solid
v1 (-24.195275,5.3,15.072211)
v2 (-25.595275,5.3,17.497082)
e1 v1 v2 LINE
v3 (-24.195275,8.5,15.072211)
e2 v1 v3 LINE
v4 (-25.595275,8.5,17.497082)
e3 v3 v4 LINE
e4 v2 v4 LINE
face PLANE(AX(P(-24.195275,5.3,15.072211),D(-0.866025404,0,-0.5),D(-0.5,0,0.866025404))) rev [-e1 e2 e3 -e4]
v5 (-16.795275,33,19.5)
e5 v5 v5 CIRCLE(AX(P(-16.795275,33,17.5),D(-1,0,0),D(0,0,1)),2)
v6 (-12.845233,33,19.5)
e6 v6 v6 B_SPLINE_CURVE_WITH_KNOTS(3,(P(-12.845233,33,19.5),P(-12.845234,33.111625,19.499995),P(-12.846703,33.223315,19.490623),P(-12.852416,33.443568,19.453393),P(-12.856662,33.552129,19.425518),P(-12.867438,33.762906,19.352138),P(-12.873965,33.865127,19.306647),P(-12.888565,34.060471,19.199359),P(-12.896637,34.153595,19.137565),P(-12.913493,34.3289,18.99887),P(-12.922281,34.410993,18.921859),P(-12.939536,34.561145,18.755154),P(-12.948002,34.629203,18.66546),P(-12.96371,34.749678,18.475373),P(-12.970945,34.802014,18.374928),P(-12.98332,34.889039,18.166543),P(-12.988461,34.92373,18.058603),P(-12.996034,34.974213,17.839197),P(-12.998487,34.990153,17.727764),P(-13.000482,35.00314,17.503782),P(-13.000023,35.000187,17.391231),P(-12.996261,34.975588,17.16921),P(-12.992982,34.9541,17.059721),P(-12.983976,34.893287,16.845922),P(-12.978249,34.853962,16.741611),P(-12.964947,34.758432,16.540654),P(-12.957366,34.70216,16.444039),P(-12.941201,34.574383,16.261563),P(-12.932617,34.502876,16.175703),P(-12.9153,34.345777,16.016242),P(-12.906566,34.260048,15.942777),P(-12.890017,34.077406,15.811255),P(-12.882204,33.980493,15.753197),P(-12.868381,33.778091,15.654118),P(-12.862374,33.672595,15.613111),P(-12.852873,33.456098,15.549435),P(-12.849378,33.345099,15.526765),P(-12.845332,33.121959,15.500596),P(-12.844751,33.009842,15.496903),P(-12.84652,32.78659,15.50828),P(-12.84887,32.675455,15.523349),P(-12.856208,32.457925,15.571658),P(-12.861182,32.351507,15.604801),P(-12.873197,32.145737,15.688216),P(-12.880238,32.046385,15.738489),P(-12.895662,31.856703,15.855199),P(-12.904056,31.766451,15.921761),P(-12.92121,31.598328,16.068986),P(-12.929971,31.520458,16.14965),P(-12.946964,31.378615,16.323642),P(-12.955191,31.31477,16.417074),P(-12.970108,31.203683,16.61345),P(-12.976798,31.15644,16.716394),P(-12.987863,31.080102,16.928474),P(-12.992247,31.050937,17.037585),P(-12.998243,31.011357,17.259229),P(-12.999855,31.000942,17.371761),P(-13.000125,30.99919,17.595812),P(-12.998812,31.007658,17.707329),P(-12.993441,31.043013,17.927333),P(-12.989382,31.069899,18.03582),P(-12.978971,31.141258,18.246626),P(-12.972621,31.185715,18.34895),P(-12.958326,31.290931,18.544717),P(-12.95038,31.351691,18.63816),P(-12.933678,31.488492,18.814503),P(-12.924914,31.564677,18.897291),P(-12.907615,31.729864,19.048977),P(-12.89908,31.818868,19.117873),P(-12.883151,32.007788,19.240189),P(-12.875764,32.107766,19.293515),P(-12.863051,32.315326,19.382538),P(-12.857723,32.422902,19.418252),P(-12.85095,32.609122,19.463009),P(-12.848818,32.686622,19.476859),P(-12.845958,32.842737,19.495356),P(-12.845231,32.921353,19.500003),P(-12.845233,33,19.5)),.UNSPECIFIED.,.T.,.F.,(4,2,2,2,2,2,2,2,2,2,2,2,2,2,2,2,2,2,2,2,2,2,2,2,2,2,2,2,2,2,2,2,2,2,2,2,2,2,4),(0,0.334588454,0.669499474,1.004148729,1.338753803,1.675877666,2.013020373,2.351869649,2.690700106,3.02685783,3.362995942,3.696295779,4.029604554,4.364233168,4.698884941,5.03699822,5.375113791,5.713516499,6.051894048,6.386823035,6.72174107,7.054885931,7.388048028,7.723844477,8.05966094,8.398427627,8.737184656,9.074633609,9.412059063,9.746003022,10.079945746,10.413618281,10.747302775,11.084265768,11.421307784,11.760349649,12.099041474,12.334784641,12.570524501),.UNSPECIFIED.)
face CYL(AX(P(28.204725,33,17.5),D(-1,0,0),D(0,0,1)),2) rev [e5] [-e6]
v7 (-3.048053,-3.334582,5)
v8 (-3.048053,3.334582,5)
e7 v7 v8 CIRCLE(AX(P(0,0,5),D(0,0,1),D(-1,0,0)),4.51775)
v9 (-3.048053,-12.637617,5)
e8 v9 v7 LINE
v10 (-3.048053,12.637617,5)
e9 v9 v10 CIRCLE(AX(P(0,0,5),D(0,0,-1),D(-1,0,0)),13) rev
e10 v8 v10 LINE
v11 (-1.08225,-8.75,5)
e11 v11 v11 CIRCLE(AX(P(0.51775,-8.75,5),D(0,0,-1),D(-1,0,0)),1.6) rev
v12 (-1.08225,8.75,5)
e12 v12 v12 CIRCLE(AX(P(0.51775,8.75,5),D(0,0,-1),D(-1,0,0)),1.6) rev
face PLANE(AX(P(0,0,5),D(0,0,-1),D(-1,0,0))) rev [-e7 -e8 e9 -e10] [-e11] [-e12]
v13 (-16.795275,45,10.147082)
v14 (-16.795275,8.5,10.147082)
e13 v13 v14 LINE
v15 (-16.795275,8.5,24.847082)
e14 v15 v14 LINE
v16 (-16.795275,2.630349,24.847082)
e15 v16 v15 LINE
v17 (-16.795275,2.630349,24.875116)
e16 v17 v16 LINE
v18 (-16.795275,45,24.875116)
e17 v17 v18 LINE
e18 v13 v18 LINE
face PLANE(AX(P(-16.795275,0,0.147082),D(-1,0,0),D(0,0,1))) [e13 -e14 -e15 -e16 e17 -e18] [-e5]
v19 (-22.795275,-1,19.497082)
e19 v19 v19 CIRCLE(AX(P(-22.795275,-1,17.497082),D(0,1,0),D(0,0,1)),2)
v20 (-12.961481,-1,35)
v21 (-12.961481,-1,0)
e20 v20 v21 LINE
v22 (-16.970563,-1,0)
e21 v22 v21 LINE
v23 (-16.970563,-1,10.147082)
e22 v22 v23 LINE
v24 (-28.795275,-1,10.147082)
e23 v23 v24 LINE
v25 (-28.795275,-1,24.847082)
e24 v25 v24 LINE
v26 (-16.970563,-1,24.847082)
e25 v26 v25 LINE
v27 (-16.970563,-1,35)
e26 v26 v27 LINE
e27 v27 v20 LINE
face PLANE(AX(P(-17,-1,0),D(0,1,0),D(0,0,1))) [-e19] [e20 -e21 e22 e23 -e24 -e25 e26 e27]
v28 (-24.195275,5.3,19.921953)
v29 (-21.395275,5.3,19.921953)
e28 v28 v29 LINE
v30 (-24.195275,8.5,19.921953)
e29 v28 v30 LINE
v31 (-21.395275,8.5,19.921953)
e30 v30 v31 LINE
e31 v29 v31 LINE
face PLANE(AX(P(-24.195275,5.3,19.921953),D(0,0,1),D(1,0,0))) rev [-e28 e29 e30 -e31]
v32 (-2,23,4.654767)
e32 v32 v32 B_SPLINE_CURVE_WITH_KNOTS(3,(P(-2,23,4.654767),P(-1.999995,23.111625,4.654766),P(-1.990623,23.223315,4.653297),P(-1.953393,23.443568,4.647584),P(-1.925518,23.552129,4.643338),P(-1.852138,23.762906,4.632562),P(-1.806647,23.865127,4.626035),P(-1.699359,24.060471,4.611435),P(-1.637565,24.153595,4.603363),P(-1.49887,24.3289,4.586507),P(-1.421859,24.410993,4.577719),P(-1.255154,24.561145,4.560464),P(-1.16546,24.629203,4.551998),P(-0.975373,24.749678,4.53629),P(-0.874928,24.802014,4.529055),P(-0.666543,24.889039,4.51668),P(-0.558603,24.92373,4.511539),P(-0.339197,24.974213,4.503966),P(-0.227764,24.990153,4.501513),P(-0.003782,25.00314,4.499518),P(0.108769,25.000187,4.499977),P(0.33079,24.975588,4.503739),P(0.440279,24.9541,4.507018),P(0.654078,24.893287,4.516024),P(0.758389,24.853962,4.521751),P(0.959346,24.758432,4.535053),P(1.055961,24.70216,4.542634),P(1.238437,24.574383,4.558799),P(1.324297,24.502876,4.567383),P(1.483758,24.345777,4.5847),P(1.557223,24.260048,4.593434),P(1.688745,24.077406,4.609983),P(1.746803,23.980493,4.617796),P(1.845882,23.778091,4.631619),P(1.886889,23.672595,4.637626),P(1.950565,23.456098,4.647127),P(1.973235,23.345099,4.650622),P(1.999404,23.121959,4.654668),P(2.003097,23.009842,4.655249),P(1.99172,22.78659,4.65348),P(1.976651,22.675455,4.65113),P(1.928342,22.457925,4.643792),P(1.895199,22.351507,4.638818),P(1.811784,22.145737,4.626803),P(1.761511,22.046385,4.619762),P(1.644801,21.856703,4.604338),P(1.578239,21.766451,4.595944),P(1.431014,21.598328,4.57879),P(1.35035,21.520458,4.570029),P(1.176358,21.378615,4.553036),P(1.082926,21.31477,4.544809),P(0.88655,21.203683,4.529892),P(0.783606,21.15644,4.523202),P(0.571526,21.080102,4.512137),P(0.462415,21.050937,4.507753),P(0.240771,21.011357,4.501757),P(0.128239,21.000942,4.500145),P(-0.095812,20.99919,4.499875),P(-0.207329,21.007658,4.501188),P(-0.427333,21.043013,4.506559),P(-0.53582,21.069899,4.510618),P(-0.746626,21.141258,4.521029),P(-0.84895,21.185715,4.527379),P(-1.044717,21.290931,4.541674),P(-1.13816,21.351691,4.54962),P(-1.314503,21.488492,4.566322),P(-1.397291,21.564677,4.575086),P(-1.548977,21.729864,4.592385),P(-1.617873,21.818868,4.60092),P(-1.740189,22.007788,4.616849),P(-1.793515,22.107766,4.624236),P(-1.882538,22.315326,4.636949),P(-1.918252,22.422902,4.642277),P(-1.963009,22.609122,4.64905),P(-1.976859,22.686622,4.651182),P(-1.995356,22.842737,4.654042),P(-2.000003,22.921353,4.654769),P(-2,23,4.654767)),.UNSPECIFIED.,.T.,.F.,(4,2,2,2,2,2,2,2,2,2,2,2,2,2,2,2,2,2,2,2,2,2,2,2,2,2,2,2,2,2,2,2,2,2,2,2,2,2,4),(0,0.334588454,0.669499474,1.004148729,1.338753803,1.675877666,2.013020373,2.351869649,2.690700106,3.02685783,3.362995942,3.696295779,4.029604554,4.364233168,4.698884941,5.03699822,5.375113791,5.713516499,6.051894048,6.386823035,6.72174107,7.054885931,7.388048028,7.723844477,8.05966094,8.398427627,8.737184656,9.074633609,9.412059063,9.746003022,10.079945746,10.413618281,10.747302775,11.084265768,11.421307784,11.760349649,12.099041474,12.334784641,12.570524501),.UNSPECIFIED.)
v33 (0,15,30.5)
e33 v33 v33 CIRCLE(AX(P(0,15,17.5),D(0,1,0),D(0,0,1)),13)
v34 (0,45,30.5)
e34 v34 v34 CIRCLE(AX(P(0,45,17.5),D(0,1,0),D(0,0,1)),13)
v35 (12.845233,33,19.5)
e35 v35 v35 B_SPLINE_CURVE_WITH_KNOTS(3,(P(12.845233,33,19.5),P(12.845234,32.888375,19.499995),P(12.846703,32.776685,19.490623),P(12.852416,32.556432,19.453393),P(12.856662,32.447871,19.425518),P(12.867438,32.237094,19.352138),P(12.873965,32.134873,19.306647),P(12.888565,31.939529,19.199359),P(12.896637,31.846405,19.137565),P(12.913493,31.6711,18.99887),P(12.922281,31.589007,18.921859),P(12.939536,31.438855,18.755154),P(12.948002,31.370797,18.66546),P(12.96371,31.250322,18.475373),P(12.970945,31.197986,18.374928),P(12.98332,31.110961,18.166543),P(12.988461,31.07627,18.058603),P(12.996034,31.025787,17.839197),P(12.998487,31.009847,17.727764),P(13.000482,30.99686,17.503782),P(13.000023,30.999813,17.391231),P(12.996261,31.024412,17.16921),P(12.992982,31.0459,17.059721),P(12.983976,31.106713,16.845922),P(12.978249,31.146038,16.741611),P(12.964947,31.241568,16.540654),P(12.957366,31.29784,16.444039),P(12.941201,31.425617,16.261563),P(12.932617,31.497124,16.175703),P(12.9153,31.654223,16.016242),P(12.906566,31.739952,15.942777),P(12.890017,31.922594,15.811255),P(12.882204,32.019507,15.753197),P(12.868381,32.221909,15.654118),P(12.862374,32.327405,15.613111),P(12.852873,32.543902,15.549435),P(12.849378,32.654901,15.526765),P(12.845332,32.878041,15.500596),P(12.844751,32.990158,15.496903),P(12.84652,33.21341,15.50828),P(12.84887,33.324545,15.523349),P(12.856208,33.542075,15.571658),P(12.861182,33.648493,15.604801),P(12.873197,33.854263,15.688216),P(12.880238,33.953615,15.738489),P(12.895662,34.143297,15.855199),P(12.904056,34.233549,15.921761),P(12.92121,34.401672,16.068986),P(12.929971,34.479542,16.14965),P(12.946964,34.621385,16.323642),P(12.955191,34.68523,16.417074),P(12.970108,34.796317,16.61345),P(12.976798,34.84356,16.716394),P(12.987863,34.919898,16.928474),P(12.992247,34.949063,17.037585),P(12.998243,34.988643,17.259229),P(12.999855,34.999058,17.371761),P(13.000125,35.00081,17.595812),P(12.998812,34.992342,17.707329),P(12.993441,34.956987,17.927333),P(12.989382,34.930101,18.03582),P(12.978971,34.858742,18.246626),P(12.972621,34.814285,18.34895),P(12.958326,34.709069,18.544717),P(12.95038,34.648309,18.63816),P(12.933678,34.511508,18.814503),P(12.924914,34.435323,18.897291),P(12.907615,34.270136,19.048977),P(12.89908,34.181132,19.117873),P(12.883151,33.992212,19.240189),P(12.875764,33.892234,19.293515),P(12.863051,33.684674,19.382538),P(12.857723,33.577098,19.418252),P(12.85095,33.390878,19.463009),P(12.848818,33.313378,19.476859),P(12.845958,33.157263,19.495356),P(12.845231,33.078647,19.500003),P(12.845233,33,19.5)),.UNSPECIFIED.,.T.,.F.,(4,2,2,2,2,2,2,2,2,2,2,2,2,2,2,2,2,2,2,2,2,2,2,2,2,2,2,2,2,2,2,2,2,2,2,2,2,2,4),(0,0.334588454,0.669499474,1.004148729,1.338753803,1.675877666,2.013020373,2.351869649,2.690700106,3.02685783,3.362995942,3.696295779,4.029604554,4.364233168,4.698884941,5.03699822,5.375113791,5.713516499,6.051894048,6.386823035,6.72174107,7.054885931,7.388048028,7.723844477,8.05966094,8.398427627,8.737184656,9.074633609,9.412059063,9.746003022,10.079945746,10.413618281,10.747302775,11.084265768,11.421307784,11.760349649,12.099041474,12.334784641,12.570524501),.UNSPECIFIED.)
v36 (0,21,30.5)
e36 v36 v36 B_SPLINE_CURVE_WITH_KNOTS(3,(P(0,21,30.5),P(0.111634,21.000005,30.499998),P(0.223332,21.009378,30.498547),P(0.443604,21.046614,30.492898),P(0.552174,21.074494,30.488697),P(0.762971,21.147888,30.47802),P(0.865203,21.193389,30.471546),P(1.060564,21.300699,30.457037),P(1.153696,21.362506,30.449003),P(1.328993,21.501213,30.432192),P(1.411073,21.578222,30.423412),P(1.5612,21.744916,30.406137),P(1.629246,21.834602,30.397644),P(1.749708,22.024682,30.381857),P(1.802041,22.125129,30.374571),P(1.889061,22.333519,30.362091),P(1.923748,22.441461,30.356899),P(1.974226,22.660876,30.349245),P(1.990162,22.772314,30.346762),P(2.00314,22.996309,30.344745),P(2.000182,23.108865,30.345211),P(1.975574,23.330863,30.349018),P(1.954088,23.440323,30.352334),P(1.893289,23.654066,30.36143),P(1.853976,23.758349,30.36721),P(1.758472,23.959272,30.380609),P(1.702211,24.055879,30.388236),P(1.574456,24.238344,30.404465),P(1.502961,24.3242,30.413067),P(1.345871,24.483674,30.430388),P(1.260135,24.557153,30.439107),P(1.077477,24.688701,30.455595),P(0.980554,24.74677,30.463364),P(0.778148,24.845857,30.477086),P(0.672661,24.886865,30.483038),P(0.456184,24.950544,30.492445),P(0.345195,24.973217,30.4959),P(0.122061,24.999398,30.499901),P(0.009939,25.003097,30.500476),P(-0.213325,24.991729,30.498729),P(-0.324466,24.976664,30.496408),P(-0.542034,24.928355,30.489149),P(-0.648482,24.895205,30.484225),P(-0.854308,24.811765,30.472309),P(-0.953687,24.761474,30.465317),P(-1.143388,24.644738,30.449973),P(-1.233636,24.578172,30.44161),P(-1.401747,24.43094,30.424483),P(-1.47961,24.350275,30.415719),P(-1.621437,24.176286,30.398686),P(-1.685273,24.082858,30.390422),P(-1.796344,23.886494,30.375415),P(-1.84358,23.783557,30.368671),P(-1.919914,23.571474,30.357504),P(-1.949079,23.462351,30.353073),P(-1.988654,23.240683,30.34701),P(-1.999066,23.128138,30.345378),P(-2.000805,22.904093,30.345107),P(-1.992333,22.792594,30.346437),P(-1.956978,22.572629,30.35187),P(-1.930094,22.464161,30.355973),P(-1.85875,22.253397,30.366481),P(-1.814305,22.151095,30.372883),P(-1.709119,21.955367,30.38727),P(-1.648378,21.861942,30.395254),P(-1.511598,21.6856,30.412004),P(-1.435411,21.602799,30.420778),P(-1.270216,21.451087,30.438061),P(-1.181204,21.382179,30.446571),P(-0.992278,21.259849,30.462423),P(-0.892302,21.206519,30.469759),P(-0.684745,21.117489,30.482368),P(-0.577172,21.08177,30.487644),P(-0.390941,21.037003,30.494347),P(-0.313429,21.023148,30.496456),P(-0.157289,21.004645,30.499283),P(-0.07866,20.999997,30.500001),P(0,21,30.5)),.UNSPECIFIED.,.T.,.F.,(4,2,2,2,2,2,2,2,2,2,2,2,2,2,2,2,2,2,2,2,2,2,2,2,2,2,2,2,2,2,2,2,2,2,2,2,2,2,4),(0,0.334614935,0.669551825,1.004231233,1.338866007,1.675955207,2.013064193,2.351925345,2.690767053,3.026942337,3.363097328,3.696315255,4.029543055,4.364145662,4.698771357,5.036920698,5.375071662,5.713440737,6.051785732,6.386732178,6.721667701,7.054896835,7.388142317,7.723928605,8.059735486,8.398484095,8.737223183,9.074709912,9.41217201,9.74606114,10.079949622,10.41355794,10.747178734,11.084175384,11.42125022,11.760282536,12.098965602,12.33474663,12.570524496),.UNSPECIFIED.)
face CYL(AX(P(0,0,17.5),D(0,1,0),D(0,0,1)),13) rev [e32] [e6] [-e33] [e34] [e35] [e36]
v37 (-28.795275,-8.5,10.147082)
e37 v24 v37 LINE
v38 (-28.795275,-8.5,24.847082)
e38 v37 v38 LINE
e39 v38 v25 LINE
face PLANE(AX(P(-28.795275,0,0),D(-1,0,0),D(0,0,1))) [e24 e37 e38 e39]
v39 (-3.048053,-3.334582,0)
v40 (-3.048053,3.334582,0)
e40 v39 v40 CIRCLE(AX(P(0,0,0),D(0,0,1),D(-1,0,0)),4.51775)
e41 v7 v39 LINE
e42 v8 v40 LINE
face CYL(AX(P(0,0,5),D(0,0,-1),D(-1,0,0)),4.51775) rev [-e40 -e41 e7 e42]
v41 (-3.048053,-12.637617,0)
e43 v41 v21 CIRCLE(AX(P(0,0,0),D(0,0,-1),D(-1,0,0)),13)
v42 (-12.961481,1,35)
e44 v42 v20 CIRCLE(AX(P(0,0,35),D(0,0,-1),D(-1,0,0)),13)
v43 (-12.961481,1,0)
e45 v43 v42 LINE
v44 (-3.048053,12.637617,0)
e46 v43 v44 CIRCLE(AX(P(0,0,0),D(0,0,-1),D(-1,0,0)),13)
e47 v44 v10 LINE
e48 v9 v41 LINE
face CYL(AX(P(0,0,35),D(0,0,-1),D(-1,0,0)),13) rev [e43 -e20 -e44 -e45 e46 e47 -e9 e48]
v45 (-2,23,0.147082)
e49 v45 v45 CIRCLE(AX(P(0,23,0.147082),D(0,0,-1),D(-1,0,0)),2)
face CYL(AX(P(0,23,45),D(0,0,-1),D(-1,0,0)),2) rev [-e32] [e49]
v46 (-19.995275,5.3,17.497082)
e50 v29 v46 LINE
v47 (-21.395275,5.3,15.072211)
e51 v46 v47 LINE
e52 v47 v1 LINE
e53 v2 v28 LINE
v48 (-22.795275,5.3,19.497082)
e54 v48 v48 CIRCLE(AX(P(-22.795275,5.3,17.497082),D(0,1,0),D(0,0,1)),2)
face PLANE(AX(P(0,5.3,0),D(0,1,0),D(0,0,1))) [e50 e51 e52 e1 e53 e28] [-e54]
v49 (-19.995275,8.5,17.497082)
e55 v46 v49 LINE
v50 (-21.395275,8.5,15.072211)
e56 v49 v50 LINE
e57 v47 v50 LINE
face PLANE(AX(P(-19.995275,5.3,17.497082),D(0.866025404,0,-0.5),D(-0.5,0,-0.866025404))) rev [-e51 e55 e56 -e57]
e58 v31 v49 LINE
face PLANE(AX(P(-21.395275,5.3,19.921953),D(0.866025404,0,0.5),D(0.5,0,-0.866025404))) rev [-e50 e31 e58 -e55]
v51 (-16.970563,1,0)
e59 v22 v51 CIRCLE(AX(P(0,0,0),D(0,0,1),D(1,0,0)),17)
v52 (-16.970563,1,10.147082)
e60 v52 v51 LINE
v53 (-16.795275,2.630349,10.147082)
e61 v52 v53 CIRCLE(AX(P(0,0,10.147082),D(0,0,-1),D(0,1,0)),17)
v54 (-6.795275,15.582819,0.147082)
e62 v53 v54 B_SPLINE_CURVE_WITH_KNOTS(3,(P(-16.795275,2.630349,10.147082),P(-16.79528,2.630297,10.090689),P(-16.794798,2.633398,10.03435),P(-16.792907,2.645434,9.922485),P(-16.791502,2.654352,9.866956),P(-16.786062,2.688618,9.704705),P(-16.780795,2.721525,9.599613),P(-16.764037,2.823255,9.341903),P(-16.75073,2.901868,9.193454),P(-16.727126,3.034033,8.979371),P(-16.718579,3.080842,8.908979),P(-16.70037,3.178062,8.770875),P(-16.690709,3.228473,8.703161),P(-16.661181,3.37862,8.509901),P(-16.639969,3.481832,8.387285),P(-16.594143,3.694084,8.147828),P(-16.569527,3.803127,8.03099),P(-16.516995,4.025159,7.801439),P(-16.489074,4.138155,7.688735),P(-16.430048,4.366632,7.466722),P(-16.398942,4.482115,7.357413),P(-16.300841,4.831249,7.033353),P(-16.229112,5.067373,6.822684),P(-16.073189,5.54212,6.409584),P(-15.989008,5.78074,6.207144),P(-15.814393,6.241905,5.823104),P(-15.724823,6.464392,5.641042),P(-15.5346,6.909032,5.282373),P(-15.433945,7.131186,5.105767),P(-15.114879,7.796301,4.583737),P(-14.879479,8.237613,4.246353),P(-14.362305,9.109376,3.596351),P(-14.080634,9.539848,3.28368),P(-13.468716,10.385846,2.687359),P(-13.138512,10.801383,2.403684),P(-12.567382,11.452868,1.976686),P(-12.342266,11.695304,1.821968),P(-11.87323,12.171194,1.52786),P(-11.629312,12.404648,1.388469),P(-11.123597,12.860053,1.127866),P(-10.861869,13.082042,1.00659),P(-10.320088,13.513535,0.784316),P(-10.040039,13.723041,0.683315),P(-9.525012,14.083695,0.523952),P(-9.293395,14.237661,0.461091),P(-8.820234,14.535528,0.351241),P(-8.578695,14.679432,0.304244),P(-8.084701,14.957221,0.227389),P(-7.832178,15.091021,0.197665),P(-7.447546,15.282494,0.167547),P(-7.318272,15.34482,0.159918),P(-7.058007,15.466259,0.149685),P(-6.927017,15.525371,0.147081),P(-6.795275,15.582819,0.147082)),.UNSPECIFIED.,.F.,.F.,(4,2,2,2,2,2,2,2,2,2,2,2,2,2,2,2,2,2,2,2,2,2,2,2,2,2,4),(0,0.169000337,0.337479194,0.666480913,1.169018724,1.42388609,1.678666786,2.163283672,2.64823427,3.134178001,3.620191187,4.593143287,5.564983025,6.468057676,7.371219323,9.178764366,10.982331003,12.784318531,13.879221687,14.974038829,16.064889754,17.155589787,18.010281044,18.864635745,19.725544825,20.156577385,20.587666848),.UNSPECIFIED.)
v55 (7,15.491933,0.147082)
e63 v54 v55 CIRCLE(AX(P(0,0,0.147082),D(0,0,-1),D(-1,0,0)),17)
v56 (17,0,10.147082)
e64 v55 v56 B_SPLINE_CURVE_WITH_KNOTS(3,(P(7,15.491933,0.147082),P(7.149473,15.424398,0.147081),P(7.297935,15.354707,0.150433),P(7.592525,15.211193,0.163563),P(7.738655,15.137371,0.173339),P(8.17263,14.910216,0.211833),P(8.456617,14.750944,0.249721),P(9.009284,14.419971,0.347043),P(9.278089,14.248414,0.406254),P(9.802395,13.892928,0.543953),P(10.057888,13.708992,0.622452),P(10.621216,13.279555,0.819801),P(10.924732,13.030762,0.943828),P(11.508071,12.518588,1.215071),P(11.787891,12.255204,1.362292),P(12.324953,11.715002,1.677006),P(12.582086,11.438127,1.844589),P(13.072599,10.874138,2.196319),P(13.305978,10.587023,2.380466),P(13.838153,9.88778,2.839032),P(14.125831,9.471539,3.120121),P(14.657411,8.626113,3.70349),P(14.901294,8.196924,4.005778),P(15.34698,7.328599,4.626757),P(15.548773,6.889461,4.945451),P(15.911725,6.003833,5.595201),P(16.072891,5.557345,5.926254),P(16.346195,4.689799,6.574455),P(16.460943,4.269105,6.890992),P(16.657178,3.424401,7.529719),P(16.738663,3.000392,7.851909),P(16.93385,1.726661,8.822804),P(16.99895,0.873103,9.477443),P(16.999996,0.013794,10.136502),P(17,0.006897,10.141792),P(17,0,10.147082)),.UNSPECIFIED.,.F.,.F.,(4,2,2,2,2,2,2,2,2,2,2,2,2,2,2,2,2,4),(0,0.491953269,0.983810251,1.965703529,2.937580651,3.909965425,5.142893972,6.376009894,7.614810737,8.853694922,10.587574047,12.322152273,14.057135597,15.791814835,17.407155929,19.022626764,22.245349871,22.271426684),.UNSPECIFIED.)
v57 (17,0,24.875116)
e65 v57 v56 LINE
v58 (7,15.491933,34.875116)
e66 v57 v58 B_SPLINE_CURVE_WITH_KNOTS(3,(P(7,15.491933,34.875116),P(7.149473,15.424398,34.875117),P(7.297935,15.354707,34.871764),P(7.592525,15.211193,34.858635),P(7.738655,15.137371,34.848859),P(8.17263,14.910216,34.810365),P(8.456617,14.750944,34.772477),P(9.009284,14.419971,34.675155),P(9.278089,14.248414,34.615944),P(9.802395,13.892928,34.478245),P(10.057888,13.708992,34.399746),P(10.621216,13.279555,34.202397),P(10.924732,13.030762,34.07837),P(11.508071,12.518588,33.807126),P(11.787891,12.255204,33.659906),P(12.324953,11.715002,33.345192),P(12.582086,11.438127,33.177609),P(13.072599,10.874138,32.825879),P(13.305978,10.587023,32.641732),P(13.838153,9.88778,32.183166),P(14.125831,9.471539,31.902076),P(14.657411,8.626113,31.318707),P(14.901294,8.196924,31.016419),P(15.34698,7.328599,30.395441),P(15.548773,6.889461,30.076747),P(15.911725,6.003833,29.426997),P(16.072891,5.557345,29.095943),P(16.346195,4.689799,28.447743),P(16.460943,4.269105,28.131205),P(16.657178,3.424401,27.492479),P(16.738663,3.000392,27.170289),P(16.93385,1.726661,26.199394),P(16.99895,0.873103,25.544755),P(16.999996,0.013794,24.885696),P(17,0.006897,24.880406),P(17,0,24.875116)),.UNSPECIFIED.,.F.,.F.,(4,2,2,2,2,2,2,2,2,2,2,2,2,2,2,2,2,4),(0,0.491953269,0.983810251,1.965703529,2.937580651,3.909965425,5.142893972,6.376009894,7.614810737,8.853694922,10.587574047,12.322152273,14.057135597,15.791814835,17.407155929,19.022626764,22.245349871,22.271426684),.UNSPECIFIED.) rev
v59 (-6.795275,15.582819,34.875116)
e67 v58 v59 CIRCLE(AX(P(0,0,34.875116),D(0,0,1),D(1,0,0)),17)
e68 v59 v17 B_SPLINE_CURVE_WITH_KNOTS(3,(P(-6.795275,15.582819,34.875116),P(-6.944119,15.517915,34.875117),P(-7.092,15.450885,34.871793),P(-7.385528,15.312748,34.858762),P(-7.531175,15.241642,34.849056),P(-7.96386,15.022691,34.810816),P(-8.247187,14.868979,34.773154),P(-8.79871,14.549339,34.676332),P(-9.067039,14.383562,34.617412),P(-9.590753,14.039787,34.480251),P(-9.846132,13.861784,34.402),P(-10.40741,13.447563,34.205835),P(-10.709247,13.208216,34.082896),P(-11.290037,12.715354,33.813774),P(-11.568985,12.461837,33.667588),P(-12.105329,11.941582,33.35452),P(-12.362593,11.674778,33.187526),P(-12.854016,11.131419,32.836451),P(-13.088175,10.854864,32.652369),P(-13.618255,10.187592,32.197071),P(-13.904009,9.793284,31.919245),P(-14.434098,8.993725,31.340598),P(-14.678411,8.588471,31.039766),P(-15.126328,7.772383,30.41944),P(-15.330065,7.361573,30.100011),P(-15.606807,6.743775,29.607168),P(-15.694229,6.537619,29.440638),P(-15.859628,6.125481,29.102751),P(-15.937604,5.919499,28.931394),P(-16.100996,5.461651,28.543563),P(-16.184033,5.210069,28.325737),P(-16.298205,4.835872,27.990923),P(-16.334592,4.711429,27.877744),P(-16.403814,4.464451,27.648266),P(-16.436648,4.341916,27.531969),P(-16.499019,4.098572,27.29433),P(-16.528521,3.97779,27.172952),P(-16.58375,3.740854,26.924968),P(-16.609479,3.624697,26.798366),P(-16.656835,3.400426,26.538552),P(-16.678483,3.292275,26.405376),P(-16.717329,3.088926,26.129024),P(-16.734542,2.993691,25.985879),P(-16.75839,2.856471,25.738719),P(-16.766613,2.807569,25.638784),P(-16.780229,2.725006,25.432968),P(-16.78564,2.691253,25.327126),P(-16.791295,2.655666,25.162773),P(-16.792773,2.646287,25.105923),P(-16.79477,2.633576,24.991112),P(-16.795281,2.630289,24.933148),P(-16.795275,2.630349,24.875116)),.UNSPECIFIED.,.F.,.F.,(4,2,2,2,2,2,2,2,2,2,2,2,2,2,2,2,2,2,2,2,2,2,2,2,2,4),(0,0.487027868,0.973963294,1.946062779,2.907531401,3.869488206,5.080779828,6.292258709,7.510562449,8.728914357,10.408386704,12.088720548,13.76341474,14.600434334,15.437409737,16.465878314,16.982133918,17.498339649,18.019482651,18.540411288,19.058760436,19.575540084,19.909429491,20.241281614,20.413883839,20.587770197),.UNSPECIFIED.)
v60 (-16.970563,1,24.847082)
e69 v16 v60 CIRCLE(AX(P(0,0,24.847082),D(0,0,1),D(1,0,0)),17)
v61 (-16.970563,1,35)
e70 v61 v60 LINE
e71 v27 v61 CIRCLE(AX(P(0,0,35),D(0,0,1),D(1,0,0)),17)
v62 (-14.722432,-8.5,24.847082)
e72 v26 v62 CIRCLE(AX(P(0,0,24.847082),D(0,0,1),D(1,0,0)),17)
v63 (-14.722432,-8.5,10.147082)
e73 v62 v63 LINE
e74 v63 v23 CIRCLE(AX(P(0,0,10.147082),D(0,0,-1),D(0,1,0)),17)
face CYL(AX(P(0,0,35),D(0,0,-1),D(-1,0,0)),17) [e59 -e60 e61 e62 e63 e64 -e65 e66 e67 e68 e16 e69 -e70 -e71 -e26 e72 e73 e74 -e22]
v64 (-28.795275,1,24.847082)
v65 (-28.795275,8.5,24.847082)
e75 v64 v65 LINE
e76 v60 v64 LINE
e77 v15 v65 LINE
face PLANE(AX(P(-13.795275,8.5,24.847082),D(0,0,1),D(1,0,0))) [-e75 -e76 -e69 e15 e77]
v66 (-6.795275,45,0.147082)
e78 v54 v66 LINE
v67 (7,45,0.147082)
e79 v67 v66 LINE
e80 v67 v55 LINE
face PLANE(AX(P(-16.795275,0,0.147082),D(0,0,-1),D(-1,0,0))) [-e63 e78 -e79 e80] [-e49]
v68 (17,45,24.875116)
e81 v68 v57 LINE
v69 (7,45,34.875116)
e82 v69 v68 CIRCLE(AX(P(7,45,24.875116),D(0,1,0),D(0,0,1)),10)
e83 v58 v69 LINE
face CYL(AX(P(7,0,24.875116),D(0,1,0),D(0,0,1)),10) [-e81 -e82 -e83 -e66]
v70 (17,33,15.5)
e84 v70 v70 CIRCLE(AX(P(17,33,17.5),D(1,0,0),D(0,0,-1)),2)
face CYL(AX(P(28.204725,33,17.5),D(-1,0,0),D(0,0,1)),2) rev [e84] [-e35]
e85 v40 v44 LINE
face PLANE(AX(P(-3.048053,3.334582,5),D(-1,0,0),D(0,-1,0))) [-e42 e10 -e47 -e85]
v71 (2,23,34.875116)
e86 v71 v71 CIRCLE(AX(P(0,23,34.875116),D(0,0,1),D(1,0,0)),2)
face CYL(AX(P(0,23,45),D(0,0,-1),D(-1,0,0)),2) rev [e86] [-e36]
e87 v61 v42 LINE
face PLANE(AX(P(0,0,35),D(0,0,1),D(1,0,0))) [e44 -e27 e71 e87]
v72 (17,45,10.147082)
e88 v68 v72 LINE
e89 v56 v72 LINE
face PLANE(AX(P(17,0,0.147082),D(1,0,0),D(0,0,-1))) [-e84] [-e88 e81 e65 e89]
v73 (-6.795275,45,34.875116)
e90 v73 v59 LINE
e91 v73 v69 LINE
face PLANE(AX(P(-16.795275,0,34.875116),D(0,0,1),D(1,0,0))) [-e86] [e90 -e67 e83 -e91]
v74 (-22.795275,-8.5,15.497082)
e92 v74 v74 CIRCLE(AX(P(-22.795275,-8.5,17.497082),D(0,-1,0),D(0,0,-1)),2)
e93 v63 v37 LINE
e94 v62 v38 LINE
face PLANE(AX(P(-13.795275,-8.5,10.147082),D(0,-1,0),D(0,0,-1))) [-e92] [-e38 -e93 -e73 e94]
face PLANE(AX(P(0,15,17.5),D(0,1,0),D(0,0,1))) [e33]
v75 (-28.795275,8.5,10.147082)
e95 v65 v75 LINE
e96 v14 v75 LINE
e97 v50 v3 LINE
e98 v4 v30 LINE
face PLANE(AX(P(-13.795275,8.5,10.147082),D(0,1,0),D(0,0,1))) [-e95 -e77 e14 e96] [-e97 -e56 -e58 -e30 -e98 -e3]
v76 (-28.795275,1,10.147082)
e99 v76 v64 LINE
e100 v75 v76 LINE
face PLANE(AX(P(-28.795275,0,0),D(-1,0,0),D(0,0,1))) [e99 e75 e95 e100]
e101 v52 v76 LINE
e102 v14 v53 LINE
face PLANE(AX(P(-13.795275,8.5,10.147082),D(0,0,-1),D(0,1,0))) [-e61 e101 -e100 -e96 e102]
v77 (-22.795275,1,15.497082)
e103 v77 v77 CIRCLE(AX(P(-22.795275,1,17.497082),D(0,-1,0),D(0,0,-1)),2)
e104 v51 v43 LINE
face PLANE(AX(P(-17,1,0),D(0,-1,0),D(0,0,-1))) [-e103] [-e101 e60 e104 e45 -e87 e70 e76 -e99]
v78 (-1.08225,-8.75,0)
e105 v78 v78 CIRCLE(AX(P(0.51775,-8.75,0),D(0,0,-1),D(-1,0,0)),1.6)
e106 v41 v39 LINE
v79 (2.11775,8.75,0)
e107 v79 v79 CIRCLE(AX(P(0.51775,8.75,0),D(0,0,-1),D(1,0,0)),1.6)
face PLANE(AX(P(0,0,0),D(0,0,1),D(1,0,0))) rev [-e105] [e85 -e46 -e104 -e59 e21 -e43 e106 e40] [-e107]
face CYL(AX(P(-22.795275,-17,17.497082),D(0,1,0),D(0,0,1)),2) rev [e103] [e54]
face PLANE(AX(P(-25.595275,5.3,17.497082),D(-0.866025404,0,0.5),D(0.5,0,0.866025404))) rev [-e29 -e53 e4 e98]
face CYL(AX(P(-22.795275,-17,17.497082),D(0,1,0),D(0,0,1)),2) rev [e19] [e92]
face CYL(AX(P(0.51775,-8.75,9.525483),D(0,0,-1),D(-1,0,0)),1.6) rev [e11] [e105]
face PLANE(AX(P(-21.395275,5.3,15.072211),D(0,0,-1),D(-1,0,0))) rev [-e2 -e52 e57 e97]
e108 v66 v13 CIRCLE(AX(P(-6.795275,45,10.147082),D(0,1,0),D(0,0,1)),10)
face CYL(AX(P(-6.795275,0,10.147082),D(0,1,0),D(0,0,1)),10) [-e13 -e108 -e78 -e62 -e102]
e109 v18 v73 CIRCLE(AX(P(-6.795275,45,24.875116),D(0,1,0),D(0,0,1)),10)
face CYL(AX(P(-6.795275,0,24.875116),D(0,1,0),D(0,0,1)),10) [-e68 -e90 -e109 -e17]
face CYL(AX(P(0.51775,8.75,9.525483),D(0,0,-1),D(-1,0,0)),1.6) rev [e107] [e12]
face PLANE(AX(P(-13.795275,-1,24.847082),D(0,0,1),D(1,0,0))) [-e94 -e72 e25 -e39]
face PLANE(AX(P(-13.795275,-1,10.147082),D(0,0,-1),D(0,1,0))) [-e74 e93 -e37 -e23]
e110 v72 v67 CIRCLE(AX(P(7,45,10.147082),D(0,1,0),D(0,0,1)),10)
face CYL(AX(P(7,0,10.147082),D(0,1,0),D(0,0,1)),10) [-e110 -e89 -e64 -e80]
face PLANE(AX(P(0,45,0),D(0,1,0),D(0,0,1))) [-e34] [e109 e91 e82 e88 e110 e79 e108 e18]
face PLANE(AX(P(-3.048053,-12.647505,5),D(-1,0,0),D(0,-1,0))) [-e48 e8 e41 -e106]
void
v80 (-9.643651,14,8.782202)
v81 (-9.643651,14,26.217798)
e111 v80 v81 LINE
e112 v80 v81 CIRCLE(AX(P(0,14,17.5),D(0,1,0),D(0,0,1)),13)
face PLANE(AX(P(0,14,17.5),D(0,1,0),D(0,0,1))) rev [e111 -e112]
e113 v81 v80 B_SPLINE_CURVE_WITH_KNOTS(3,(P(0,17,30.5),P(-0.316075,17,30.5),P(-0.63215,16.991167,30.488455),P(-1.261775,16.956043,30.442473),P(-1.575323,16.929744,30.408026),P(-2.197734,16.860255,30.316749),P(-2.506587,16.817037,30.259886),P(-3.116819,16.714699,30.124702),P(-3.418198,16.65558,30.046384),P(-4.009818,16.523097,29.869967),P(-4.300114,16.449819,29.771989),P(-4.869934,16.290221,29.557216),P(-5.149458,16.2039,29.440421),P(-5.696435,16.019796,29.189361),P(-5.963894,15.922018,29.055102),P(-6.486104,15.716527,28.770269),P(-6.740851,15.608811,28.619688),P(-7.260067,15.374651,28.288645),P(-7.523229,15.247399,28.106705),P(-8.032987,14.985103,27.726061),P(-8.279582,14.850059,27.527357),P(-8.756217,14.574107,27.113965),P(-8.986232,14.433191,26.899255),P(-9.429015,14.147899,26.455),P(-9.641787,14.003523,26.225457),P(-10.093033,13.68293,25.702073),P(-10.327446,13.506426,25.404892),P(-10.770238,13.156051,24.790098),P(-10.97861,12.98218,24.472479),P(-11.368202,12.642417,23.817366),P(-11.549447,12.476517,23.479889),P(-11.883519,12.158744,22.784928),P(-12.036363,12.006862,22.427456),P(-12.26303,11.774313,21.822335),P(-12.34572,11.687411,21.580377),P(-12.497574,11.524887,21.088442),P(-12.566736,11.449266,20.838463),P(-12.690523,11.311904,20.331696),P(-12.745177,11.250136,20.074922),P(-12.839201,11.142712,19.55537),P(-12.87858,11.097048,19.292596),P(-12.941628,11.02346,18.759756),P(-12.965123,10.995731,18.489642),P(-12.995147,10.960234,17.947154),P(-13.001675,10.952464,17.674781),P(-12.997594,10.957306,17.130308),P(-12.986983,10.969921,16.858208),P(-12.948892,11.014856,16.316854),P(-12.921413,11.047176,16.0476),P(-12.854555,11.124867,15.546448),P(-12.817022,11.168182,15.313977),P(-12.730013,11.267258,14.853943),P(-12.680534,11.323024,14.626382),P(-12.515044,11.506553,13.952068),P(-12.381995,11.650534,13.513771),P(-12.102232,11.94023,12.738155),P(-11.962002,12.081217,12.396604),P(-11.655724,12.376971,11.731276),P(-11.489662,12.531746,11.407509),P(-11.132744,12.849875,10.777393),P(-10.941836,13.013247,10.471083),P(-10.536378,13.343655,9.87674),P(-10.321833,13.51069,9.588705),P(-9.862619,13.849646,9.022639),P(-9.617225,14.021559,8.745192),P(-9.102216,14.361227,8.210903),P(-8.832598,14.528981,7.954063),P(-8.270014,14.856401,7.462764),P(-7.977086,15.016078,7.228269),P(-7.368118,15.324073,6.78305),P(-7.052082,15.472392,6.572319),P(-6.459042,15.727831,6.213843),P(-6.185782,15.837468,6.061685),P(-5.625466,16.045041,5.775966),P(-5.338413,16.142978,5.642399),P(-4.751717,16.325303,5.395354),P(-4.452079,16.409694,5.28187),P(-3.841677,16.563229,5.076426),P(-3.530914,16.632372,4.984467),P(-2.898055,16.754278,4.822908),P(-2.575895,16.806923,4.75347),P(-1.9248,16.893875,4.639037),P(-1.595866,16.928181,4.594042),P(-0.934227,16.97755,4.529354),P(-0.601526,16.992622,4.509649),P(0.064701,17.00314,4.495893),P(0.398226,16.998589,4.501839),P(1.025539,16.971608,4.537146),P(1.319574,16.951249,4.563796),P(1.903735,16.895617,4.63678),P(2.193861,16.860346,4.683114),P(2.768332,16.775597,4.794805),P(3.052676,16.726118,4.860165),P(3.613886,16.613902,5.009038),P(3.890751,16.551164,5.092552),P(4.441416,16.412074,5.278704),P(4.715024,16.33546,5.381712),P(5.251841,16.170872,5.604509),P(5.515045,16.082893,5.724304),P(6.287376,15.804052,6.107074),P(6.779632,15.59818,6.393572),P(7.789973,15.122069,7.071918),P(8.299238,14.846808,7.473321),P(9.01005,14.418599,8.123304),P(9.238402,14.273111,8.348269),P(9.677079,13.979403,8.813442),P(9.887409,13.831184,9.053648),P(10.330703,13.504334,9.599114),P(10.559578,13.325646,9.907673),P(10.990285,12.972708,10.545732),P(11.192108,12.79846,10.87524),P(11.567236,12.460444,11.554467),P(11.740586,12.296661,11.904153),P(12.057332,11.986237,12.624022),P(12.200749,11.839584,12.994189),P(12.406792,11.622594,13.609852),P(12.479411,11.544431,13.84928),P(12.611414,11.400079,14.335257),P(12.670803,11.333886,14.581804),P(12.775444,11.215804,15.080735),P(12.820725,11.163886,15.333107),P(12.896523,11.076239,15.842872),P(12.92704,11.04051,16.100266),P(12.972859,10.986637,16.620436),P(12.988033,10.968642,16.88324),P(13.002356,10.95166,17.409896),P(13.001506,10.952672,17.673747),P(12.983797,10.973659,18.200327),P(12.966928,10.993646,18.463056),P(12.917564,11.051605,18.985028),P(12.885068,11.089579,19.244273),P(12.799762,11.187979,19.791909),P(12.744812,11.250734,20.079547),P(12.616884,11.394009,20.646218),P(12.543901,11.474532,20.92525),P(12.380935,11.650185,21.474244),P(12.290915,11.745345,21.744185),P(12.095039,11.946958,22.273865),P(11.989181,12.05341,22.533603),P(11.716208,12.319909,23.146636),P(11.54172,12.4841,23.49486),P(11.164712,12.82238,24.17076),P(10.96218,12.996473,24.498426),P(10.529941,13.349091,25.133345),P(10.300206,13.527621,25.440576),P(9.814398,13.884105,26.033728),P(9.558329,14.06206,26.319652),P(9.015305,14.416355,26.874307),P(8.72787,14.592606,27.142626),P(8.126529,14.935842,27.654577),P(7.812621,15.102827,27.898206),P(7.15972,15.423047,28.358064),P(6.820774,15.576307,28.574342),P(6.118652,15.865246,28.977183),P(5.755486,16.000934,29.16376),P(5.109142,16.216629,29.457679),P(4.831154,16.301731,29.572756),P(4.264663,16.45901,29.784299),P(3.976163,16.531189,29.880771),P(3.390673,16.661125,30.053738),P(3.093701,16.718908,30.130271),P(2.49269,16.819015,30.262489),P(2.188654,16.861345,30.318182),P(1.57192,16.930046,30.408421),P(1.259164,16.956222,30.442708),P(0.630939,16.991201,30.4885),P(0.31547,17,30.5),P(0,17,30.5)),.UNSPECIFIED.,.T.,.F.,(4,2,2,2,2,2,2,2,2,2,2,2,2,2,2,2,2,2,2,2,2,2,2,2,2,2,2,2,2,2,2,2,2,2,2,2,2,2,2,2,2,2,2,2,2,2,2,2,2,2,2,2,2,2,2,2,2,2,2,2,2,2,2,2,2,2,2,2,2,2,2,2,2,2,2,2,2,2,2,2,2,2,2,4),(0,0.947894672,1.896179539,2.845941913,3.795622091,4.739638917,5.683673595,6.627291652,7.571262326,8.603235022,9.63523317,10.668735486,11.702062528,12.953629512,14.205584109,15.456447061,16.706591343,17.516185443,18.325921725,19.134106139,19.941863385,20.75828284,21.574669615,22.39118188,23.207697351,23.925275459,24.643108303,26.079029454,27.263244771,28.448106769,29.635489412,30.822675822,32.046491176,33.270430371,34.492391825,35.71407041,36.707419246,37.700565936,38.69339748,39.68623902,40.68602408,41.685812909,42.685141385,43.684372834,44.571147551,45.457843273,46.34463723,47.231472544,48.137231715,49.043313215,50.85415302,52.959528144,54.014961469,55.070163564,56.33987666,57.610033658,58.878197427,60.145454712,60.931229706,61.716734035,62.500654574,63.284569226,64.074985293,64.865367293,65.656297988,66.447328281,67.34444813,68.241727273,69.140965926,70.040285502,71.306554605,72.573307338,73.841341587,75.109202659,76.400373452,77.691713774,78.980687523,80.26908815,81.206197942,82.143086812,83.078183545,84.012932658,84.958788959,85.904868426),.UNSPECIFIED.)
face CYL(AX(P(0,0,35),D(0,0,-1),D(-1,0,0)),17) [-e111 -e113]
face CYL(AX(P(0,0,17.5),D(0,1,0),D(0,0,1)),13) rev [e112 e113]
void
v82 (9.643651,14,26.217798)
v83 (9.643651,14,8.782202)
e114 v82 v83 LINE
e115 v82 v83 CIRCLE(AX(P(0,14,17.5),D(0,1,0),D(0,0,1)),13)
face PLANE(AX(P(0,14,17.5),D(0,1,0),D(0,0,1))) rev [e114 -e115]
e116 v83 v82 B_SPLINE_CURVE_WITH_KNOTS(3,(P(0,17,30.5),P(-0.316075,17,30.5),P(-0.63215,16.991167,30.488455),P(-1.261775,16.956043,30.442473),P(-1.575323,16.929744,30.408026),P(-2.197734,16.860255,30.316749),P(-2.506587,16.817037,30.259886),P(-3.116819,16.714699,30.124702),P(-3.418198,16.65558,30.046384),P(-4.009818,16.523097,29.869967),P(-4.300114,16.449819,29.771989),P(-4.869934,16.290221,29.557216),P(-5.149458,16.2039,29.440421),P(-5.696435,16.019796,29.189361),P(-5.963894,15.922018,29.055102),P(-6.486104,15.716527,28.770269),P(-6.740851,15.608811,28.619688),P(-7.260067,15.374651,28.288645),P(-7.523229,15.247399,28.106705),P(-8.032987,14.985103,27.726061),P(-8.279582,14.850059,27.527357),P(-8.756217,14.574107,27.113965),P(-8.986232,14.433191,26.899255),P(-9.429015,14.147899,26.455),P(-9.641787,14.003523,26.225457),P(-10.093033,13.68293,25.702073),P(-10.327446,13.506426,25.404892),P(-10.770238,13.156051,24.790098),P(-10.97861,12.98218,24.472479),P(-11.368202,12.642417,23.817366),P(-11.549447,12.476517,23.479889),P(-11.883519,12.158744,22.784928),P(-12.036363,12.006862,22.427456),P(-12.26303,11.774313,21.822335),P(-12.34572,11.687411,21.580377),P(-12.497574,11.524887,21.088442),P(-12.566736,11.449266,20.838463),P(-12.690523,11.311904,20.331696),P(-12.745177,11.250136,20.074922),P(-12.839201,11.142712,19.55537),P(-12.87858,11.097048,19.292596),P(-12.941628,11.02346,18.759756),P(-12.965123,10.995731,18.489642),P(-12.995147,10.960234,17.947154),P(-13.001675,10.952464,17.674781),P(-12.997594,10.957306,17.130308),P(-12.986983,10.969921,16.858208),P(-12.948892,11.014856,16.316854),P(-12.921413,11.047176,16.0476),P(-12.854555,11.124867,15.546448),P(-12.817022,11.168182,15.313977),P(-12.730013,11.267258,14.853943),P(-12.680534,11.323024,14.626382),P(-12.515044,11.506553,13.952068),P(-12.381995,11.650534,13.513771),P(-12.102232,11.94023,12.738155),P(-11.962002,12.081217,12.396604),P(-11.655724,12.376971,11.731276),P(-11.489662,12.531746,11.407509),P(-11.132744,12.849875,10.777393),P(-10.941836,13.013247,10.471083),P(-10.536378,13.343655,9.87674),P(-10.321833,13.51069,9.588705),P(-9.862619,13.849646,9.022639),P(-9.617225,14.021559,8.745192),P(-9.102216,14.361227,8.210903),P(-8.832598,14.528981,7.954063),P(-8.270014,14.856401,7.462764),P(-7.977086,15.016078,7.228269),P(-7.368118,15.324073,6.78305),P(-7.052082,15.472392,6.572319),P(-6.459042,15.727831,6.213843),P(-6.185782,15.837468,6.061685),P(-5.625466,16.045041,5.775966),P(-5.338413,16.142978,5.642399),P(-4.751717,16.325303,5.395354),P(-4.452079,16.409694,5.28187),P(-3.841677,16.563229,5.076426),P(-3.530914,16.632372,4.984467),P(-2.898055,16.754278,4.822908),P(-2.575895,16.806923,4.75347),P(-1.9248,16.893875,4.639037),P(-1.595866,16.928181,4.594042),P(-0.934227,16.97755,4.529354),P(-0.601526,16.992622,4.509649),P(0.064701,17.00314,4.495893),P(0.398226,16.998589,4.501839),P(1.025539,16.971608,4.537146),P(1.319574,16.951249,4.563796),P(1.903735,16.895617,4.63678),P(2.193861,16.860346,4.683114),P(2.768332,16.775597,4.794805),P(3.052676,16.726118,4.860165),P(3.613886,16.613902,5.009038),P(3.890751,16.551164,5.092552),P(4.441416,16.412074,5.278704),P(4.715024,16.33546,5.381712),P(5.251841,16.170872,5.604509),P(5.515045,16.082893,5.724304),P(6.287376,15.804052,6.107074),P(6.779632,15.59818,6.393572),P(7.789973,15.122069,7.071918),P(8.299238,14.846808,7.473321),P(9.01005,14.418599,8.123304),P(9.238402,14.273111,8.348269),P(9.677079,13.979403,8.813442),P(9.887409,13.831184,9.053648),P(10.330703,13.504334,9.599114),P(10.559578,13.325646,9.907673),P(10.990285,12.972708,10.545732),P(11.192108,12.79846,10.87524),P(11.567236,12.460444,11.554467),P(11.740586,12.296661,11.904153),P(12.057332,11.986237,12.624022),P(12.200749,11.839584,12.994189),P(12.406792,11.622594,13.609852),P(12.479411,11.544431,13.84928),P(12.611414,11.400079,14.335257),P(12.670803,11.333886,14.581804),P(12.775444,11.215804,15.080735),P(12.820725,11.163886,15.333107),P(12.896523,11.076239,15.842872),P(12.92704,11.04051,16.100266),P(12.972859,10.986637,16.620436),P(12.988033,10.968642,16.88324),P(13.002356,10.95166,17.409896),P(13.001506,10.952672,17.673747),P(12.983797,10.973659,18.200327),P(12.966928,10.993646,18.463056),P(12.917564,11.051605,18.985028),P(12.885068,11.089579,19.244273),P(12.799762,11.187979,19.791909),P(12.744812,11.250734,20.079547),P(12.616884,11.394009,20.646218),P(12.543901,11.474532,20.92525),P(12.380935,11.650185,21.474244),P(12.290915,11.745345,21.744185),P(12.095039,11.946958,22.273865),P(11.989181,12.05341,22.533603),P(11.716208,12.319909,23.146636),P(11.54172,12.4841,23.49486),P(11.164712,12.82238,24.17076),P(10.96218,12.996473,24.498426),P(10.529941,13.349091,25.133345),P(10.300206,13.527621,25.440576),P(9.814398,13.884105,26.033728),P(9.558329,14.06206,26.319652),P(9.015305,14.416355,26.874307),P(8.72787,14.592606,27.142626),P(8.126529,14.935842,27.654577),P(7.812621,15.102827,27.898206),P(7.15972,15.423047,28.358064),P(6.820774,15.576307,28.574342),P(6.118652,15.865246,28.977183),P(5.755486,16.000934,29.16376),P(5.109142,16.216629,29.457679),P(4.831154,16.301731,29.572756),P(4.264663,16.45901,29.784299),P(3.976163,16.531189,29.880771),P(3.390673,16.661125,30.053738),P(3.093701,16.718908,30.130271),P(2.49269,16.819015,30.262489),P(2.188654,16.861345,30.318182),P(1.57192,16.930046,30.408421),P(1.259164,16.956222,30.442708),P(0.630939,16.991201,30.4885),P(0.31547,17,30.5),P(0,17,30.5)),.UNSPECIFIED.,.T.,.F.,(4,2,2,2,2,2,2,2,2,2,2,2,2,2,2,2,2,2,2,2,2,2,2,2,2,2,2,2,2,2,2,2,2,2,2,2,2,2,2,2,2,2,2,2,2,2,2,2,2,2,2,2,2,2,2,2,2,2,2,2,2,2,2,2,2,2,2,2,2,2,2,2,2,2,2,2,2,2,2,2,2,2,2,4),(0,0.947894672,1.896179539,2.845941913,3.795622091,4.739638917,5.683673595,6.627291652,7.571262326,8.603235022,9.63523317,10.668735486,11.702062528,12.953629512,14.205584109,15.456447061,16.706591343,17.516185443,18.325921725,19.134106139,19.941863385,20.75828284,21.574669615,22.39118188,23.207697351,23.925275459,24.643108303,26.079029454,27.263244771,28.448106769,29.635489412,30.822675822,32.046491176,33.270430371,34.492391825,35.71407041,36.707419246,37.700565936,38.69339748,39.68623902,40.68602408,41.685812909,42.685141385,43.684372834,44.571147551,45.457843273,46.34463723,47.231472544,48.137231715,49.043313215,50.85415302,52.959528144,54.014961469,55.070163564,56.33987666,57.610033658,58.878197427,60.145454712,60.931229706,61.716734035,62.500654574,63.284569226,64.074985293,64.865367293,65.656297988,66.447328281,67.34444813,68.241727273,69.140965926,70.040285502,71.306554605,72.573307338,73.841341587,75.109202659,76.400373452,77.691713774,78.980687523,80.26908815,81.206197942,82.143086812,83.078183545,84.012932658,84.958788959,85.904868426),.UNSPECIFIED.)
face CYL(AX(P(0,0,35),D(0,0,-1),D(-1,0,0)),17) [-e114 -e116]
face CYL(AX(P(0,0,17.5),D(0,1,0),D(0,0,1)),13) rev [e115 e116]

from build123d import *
from build123d.topology import SkipClean

# Parameters (mm, degrees)
SKETCH_1_R                            = 17
SKETCH_1_R_2                          = 12
EXTRUDE_2_DEPTH                       = 35
SKETCH_3_W                            = 33.795275063
SKETCH_3_H                            = 34.72803434
SKETCH_3_R                            = 13
EXTRUDE_7_DEPTH                       = 45
SKETCH_4_R                            = 13
CUT_EXTRUDE_1_DEPTH                   = 60.489495005
SKETCH_12_R                           = 2
CUT_EXTRUDE_11_DEPTH                  = 45
SKETCH_15_R                           = 2
CUT_EXTRUDE_12_DEPTH                  = 45
FILLET_4_R                            = 10
SKETCH_20_R                           = 13
CUT_EXTRUDE_18_DEPTH                  = 31
EXTRUDE_START                         = 1
SKETCH_25_R                           = 13
EXTRUDE_10_DEPTH                      = 1
CUT_EXTRUDE_19_REACH                  = 68.273
CUT_EXTRUDE_19_END_RADIUS             = 13
SKETCH_26_W                           = 35
SKETCH_26_H                           = 2
CUT_EXTRUDE_19_DIRECTION_2_REACH      = 68.273
CUT_EXTRUDE_19_DIRECTION_2_END_RADIUS = 17
EXTRUDE_11_DEPTH                      = 12
EXTRUDE_11_DEPTH_BACK                 = 3
SKETCH_27_W                           = 14.7
SKETCH_27_H                           = 7.5
EXTRUDE_12_DEPTH                      = 5
SKETCH_30_R                           = 1.6
CUT_EXTRUDE_21_DEPTH                  = 5
CUT_EXTRUDE_22_DEPTH                  = 3.2
SKETCH_34_R                           = 2
CUT_EXTRUDE_23_DEPTH                  = 59.192936687


with BuildPart() as part:
    # Эскиз1 → Бобышка-Вытянуть2 (new body)
    with BuildSketch(Plane.XY):
        Circle(SKETCH_1_R)
        Circle(SKETCH_1_R_2, mode=Mode.SUBTRACT)
    extrude(amount=EXTRUDE_2_DEPTH)

    # Эскиз3 → Бобышка-Вытянуть7 (add)
    with BuildSketch(Plane(origin=(0, 45, 0), x_dir=(1, 0, 0), z_dir=(0, 1, 0))):
        with Locations((0.102362468, -17.511098906)):
            Rectangle(SKETCH_3_W, SKETCH_3_H)
        with Locations(Location((0, -17.5, 0), (0, 0, 270))):
            Circle(SKETCH_3_R, mode=Mode.SUBTRACT)
    extrude(amount=-EXTRUDE_7_DEPTH)

    # Эскиз4 → Вырез-Вытянуть1 (cut, through all)
    with BuildSketch(Plane(origin=(0, 0, 0), x_dir=(-1, 0, 0), z_dir=(0, 0, -1))):
        Circle(SKETCH_4_R)
    extrude(amount=-CUT_EXTRUDE_1_DEPTH, mode=Mode.SUBTRACT)

    # Эскиз12 → Вырез-Вытянуть11 (cut)
    with BuildSketch(Plane(origin=(0, 0, 0), x_dir=(-1, 0, 0), z_dir=(0, 0, -1))):
        with Locations((0, 23)):
            Circle(SKETCH_12_R)
    extrude(amount=-CUT_EXTRUDE_11_DEPTH, mode=Mode.SUBTRACT)

    # Эскиз15 → Вырез-Вытянуть12 (cut)
    with BuildSketch(Plane.ZY.offset(16.795275063)):
        with Locations((17.5, 33)):
            Circle(SKETCH_15_R)
    extrude(amount=-CUT_EXTRUDE_12_DEPTH, mode=Mode.SUBTRACT)

    # Скругление4
    # the kernel refuses this fillet: 10 mm, written as the material it takes off along each edge
    with BuildSketch(Plane(origin=(-16.795275063, 70, 34.875116076), x_dir=(1, 0, 0), z_dir=(0, -1, 0))) as fillet_4_piece_1_section:
        with BuildLine():
            CenterArc((FILLET_4_R, -FILLET_4_R), FILLET_4_R, 90, 90)
            Line((0, -FILLET_4_R), (0, 0))
            Line((0, 0), (FILLET_4_R, 0))
        make_face()
    fillet_4_piece_1 = extrude(amount=92.369651061, mode=Mode.PRIVATE)
    fillet_4_piece_1 = fillet_4_piece_1 - Plane(origin=(0, 0, 32.54483178), x_dir=(1, 0, 0), z_dir=(0, 0, -1)) * Cylinder(17, 225, mode=Mode.PRIVATE)
    add(fillet_4_piece_1, mode=Mode.SUBTRACT)
    with BuildSketch(Plane(origin=(17, 70, 0.147081736), x_dir=(0, 0, 1), z_dir=(0, -1, 0))) as fillet_4_piece_2_section:
        with BuildLine():
            CenterArc((FILLET_4_R, FILLET_4_R), FILLET_4_R, 180, 90)
            Line((0, FILLET_4_R), (0, 0))
            Line((0, 0), (FILLET_4_R, 0))
        make_face()
    fillet_4_piece_2 = extrude(amount=95, mode=Mode.PRIVATE)
    fillet_4_piece_2 = fillet_4_piece_2 - Plane(origin=(0, 0, 2.486350956), x_dir=(1, 0, 0), z_dir=(0, 0, -1)) * Cylinder(17, 230, mode=Mode.PRIVATE)
    add(fillet_4_piece_2, mode=Mode.SUBTRACT)
    with BuildSketch(Plane(origin=(17, 70, 34.875116076), x_dir=(0, 0, -1), z_dir=(0, -1, 0))) as fillet_4_piece_3_section:
        with BuildLine():
            CenterArc((FILLET_4_R, -FILLET_4_R), FILLET_4_R, 90, 90)
            Line((0, -FILLET_4_R), (0, 0))
            Line((0, 0), (FILLET_4_R, 0))
        make_face()
    fillet_4_piece_3 = extrude(amount=95, mode=Mode.PRIVATE)
    fillet_4_piece_3 = fillet_4_piece_3 - Plane(origin=(0, 0, 32.535846855), x_dir=(1, 0, 0), z_dir=(0, 0, -1)) * Cylinder(17, 230, mode=Mode.PRIVATE)
    add(fillet_4_piece_3, mode=Mode.SUBTRACT)
    with BuildSketch(Plane(origin=(-16.795275063, 70, 0.147081736), x_dir=(0, 0, 1), z_dir=(0, -1, 0))) as fillet_4_piece_4_section:
        with BuildLine():
            CenterArc((FILLET_4_R, -FILLET_4_R), FILLET_4_R, 90, 90)
            Line((0, -FILLET_4_R), (0, 0))
            Line((0, 0), (FILLET_4_R, 0))
        make_face()
    fillet_4_piece_4 = extrude(amount=92.369651061, mode=Mode.PRIVATE)
    fillet_4_piece_4 = fillet_4_piece_4 - Plane(origin=(0, 0, 2.477367304), x_dir=(1, 0, 0), z_dir=(0, 0, -1)) * Cylinder(17, 225, mode=Mode.PRIVATE)
    add(fillet_4_piece_4, mode=Mode.SUBTRACT)

    # Эскиз20 → Вырез-Вытянуть18 (cut)
    with SkipClean():  # the faces are left unmerged after this step: merging them gives an invalid solid
        with BuildSketch(Plane(origin=(0, 45, 0), x_dir=(1, 0, 0), z_dir=(0, 1, 0))):
            with Locations(Location((0, -17.5, 0), (0, 0, 270))):
                Circle(SKETCH_20_R)
        extrude(amount=-CUT_EXTRUDE_18_DEPTH, mode=Mode.SUBTRACT)

    # Эскиз25 → Бобышка-Вытянуть10 (add)
    with BuildSketch(Plane(origin=(0, 14, 0), x_dir=(1, 0, 0), z_dir=(0, 1, 0)).offset(EXTRUDE_START)):
        with Locations(Location((0, -17.5, 0), (0, 0, 270))):
            Circle(SKETCH_25_R)
    extrude(amount=-EXTRUDE_10_DEPTH)

    # Вырез-Вытянуть19: up to this cylinder (the profile starts outside it)
    cut_extrude_19_end = Plane(origin=(0, 0, 17.5), z_dir=(0, 0, -1)) * Cylinder(CUT_EXTRUDE_19_END_RADIUS, 163.546, mode=Mode.PRIVATE)
    # Эскиз26 → Вырез-Вытянуть19 (cut, up to the surface)
    with BuildSketch(Plane.ZY.offset(16.795275063), mode=Mode.PRIVATE) as cut_extrude_19_sk1:
        with Locations((17.5, 0)):
            Rectangle(SKETCH_26_W, SKETCH_26_H)
    cut_extrude_19_tool1 = extrude(cut_extrude_19_sk1.sketch, amount=-CUT_EXTRUDE_19_REACH, mode=Mode.PRIVATE) - cut_extrude_19_end
    add(cut_extrude_19_tool1.solids().sort_by_distance((-16.795275, 0, 17.5))[0], mode=Mode.SUBTRACT)

    # Вырез-Вытянуть19 direction 2: up to this cylinder (the profile starts inside it)
    cut_extrude_19_direction_2_end = Plane(origin=(0, 0, 17.5), z_dir=(0, 0, -1)) * Cylinder(CUT_EXTRUDE_19_DIRECTION_2_END_RADIUS, 171.546, mode=Mode.PRIVATE)
    # Эскиз26 → Вырез-Вытянуть19 direction 2 (cut, up to the surface)
    with BuildSketch(Plane.ZY.offset(16.795275063), mode=Mode.PRIVATE) as cut_extrude_19_direction_2_sk1:
        with Locations((17.5, 0)):
            Rectangle(SKETCH_26_W, SKETCH_26_H)
    cut_extrude_19_direction_2_tool1 = extrude(cut_extrude_19_direction_2_sk1.sketch, amount=CUT_EXTRUDE_19_DIRECTION_2_REACH, mode=Mode.PRIVATE) & cut_extrude_19_direction_2_end
    add(cut_extrude_19_direction_2_tool1.solids().sort_by_distance((-16.795275, 0, 17.5))[0], mode=Mode.SUBTRACT)

    # Эскиз27 → Бобышка-Вытянуть11 (add, two sides: drawn at the far end of the back side and taken through both)
    with BuildSketch(Plane.ZY.offset(16.795275063).offset(-EXTRUDE_11_DEPTH_BACK)):
        with Locations((17.497081736, 4.75)):
            Rectangle(SKETCH_27_W, SKETCH_27_H)
        with Locations((17.497081736, -4.75)):
            Rectangle(SKETCH_27_W, SKETCH_27_H)
    extrude(amount=EXTRUDE_11_DEPTH + EXTRUDE_11_DEPTH_BACK)

    # Эскиз29 → Бобышка-Вытянуть12 (add)
    with BuildSketch(Plane(origin=(0, 0, 0), x_dir=(-1, 0, 0), z_dir=(0, 0, -1))):
        with BuildLine():
            Line((3.04805277, -12.647504667), (3.04805277, -3.334582187))
            ThreePointArc((3.04805277, -3.334582187), (-4.517749888, 0), (3.04805277, 3.334582187))
            Line((3.04805277, 3.334582187), (3.04805277, 12.647504667))
            ThreePointArc((3.04805277, 12.647504667), (-13.009611831, 0), (3.04805277, -12.647504667))
        make_face()
    extrude(amount=-EXTRUDE_12_DEPTH)

    # Эскиз30 → Вырез-Вытянуть21 (cut)
    with BuildSketch(Plane(origin=(0, 0, 0), x_dir=(-1, 0, 0), z_dir=(0, 0, -1))):
        with Locations((-0.517749888, -8.75)):
            Circle(SKETCH_30_R)
        with Locations((-0.517749888, 8.75)):
            Circle(SKETCH_30_R)
    extrude(amount=-CUT_EXTRUDE_21_DEPTH, mode=Mode.SUBTRACT)

    # Эскиз28 → Вырез-Вытянуть22 (cut)
    with BuildSketch(Plane(origin=(0, 8.5, 0), x_dir=(1, 0, 0), z_dir=(0, 1, 0))):
        Polygon((-25.595275063, -17.497081736), (-24.195275063, -19.921952866), (-21.395275063, -19.921952866), (-19.995275063, -17.497081736), (-21.395275063, -15.072210605), (-24.195275063, -15.072210605), align=None)
    extrude(amount=-CUT_EXTRUDE_22_DEPTH, mode=Mode.SUBTRACT)

    # Эскиз34 → Вырез-Вытянуть23 (cut, through all)
    with BuildSketch(Plane(origin=(0, 8.5, 0), x_dir=(1, 0, 0), z_dir=(0, 1, 0))):
        with Locations(Location((-22.795275063, -17.497081736, 0), (0, 0, 270))):
            Circle(SKETCH_34_R)
    extrude(amount=-CUT_EXTRUDE_23_DEPTH, mode=Mode.SUBTRACT)


solid = part.part
